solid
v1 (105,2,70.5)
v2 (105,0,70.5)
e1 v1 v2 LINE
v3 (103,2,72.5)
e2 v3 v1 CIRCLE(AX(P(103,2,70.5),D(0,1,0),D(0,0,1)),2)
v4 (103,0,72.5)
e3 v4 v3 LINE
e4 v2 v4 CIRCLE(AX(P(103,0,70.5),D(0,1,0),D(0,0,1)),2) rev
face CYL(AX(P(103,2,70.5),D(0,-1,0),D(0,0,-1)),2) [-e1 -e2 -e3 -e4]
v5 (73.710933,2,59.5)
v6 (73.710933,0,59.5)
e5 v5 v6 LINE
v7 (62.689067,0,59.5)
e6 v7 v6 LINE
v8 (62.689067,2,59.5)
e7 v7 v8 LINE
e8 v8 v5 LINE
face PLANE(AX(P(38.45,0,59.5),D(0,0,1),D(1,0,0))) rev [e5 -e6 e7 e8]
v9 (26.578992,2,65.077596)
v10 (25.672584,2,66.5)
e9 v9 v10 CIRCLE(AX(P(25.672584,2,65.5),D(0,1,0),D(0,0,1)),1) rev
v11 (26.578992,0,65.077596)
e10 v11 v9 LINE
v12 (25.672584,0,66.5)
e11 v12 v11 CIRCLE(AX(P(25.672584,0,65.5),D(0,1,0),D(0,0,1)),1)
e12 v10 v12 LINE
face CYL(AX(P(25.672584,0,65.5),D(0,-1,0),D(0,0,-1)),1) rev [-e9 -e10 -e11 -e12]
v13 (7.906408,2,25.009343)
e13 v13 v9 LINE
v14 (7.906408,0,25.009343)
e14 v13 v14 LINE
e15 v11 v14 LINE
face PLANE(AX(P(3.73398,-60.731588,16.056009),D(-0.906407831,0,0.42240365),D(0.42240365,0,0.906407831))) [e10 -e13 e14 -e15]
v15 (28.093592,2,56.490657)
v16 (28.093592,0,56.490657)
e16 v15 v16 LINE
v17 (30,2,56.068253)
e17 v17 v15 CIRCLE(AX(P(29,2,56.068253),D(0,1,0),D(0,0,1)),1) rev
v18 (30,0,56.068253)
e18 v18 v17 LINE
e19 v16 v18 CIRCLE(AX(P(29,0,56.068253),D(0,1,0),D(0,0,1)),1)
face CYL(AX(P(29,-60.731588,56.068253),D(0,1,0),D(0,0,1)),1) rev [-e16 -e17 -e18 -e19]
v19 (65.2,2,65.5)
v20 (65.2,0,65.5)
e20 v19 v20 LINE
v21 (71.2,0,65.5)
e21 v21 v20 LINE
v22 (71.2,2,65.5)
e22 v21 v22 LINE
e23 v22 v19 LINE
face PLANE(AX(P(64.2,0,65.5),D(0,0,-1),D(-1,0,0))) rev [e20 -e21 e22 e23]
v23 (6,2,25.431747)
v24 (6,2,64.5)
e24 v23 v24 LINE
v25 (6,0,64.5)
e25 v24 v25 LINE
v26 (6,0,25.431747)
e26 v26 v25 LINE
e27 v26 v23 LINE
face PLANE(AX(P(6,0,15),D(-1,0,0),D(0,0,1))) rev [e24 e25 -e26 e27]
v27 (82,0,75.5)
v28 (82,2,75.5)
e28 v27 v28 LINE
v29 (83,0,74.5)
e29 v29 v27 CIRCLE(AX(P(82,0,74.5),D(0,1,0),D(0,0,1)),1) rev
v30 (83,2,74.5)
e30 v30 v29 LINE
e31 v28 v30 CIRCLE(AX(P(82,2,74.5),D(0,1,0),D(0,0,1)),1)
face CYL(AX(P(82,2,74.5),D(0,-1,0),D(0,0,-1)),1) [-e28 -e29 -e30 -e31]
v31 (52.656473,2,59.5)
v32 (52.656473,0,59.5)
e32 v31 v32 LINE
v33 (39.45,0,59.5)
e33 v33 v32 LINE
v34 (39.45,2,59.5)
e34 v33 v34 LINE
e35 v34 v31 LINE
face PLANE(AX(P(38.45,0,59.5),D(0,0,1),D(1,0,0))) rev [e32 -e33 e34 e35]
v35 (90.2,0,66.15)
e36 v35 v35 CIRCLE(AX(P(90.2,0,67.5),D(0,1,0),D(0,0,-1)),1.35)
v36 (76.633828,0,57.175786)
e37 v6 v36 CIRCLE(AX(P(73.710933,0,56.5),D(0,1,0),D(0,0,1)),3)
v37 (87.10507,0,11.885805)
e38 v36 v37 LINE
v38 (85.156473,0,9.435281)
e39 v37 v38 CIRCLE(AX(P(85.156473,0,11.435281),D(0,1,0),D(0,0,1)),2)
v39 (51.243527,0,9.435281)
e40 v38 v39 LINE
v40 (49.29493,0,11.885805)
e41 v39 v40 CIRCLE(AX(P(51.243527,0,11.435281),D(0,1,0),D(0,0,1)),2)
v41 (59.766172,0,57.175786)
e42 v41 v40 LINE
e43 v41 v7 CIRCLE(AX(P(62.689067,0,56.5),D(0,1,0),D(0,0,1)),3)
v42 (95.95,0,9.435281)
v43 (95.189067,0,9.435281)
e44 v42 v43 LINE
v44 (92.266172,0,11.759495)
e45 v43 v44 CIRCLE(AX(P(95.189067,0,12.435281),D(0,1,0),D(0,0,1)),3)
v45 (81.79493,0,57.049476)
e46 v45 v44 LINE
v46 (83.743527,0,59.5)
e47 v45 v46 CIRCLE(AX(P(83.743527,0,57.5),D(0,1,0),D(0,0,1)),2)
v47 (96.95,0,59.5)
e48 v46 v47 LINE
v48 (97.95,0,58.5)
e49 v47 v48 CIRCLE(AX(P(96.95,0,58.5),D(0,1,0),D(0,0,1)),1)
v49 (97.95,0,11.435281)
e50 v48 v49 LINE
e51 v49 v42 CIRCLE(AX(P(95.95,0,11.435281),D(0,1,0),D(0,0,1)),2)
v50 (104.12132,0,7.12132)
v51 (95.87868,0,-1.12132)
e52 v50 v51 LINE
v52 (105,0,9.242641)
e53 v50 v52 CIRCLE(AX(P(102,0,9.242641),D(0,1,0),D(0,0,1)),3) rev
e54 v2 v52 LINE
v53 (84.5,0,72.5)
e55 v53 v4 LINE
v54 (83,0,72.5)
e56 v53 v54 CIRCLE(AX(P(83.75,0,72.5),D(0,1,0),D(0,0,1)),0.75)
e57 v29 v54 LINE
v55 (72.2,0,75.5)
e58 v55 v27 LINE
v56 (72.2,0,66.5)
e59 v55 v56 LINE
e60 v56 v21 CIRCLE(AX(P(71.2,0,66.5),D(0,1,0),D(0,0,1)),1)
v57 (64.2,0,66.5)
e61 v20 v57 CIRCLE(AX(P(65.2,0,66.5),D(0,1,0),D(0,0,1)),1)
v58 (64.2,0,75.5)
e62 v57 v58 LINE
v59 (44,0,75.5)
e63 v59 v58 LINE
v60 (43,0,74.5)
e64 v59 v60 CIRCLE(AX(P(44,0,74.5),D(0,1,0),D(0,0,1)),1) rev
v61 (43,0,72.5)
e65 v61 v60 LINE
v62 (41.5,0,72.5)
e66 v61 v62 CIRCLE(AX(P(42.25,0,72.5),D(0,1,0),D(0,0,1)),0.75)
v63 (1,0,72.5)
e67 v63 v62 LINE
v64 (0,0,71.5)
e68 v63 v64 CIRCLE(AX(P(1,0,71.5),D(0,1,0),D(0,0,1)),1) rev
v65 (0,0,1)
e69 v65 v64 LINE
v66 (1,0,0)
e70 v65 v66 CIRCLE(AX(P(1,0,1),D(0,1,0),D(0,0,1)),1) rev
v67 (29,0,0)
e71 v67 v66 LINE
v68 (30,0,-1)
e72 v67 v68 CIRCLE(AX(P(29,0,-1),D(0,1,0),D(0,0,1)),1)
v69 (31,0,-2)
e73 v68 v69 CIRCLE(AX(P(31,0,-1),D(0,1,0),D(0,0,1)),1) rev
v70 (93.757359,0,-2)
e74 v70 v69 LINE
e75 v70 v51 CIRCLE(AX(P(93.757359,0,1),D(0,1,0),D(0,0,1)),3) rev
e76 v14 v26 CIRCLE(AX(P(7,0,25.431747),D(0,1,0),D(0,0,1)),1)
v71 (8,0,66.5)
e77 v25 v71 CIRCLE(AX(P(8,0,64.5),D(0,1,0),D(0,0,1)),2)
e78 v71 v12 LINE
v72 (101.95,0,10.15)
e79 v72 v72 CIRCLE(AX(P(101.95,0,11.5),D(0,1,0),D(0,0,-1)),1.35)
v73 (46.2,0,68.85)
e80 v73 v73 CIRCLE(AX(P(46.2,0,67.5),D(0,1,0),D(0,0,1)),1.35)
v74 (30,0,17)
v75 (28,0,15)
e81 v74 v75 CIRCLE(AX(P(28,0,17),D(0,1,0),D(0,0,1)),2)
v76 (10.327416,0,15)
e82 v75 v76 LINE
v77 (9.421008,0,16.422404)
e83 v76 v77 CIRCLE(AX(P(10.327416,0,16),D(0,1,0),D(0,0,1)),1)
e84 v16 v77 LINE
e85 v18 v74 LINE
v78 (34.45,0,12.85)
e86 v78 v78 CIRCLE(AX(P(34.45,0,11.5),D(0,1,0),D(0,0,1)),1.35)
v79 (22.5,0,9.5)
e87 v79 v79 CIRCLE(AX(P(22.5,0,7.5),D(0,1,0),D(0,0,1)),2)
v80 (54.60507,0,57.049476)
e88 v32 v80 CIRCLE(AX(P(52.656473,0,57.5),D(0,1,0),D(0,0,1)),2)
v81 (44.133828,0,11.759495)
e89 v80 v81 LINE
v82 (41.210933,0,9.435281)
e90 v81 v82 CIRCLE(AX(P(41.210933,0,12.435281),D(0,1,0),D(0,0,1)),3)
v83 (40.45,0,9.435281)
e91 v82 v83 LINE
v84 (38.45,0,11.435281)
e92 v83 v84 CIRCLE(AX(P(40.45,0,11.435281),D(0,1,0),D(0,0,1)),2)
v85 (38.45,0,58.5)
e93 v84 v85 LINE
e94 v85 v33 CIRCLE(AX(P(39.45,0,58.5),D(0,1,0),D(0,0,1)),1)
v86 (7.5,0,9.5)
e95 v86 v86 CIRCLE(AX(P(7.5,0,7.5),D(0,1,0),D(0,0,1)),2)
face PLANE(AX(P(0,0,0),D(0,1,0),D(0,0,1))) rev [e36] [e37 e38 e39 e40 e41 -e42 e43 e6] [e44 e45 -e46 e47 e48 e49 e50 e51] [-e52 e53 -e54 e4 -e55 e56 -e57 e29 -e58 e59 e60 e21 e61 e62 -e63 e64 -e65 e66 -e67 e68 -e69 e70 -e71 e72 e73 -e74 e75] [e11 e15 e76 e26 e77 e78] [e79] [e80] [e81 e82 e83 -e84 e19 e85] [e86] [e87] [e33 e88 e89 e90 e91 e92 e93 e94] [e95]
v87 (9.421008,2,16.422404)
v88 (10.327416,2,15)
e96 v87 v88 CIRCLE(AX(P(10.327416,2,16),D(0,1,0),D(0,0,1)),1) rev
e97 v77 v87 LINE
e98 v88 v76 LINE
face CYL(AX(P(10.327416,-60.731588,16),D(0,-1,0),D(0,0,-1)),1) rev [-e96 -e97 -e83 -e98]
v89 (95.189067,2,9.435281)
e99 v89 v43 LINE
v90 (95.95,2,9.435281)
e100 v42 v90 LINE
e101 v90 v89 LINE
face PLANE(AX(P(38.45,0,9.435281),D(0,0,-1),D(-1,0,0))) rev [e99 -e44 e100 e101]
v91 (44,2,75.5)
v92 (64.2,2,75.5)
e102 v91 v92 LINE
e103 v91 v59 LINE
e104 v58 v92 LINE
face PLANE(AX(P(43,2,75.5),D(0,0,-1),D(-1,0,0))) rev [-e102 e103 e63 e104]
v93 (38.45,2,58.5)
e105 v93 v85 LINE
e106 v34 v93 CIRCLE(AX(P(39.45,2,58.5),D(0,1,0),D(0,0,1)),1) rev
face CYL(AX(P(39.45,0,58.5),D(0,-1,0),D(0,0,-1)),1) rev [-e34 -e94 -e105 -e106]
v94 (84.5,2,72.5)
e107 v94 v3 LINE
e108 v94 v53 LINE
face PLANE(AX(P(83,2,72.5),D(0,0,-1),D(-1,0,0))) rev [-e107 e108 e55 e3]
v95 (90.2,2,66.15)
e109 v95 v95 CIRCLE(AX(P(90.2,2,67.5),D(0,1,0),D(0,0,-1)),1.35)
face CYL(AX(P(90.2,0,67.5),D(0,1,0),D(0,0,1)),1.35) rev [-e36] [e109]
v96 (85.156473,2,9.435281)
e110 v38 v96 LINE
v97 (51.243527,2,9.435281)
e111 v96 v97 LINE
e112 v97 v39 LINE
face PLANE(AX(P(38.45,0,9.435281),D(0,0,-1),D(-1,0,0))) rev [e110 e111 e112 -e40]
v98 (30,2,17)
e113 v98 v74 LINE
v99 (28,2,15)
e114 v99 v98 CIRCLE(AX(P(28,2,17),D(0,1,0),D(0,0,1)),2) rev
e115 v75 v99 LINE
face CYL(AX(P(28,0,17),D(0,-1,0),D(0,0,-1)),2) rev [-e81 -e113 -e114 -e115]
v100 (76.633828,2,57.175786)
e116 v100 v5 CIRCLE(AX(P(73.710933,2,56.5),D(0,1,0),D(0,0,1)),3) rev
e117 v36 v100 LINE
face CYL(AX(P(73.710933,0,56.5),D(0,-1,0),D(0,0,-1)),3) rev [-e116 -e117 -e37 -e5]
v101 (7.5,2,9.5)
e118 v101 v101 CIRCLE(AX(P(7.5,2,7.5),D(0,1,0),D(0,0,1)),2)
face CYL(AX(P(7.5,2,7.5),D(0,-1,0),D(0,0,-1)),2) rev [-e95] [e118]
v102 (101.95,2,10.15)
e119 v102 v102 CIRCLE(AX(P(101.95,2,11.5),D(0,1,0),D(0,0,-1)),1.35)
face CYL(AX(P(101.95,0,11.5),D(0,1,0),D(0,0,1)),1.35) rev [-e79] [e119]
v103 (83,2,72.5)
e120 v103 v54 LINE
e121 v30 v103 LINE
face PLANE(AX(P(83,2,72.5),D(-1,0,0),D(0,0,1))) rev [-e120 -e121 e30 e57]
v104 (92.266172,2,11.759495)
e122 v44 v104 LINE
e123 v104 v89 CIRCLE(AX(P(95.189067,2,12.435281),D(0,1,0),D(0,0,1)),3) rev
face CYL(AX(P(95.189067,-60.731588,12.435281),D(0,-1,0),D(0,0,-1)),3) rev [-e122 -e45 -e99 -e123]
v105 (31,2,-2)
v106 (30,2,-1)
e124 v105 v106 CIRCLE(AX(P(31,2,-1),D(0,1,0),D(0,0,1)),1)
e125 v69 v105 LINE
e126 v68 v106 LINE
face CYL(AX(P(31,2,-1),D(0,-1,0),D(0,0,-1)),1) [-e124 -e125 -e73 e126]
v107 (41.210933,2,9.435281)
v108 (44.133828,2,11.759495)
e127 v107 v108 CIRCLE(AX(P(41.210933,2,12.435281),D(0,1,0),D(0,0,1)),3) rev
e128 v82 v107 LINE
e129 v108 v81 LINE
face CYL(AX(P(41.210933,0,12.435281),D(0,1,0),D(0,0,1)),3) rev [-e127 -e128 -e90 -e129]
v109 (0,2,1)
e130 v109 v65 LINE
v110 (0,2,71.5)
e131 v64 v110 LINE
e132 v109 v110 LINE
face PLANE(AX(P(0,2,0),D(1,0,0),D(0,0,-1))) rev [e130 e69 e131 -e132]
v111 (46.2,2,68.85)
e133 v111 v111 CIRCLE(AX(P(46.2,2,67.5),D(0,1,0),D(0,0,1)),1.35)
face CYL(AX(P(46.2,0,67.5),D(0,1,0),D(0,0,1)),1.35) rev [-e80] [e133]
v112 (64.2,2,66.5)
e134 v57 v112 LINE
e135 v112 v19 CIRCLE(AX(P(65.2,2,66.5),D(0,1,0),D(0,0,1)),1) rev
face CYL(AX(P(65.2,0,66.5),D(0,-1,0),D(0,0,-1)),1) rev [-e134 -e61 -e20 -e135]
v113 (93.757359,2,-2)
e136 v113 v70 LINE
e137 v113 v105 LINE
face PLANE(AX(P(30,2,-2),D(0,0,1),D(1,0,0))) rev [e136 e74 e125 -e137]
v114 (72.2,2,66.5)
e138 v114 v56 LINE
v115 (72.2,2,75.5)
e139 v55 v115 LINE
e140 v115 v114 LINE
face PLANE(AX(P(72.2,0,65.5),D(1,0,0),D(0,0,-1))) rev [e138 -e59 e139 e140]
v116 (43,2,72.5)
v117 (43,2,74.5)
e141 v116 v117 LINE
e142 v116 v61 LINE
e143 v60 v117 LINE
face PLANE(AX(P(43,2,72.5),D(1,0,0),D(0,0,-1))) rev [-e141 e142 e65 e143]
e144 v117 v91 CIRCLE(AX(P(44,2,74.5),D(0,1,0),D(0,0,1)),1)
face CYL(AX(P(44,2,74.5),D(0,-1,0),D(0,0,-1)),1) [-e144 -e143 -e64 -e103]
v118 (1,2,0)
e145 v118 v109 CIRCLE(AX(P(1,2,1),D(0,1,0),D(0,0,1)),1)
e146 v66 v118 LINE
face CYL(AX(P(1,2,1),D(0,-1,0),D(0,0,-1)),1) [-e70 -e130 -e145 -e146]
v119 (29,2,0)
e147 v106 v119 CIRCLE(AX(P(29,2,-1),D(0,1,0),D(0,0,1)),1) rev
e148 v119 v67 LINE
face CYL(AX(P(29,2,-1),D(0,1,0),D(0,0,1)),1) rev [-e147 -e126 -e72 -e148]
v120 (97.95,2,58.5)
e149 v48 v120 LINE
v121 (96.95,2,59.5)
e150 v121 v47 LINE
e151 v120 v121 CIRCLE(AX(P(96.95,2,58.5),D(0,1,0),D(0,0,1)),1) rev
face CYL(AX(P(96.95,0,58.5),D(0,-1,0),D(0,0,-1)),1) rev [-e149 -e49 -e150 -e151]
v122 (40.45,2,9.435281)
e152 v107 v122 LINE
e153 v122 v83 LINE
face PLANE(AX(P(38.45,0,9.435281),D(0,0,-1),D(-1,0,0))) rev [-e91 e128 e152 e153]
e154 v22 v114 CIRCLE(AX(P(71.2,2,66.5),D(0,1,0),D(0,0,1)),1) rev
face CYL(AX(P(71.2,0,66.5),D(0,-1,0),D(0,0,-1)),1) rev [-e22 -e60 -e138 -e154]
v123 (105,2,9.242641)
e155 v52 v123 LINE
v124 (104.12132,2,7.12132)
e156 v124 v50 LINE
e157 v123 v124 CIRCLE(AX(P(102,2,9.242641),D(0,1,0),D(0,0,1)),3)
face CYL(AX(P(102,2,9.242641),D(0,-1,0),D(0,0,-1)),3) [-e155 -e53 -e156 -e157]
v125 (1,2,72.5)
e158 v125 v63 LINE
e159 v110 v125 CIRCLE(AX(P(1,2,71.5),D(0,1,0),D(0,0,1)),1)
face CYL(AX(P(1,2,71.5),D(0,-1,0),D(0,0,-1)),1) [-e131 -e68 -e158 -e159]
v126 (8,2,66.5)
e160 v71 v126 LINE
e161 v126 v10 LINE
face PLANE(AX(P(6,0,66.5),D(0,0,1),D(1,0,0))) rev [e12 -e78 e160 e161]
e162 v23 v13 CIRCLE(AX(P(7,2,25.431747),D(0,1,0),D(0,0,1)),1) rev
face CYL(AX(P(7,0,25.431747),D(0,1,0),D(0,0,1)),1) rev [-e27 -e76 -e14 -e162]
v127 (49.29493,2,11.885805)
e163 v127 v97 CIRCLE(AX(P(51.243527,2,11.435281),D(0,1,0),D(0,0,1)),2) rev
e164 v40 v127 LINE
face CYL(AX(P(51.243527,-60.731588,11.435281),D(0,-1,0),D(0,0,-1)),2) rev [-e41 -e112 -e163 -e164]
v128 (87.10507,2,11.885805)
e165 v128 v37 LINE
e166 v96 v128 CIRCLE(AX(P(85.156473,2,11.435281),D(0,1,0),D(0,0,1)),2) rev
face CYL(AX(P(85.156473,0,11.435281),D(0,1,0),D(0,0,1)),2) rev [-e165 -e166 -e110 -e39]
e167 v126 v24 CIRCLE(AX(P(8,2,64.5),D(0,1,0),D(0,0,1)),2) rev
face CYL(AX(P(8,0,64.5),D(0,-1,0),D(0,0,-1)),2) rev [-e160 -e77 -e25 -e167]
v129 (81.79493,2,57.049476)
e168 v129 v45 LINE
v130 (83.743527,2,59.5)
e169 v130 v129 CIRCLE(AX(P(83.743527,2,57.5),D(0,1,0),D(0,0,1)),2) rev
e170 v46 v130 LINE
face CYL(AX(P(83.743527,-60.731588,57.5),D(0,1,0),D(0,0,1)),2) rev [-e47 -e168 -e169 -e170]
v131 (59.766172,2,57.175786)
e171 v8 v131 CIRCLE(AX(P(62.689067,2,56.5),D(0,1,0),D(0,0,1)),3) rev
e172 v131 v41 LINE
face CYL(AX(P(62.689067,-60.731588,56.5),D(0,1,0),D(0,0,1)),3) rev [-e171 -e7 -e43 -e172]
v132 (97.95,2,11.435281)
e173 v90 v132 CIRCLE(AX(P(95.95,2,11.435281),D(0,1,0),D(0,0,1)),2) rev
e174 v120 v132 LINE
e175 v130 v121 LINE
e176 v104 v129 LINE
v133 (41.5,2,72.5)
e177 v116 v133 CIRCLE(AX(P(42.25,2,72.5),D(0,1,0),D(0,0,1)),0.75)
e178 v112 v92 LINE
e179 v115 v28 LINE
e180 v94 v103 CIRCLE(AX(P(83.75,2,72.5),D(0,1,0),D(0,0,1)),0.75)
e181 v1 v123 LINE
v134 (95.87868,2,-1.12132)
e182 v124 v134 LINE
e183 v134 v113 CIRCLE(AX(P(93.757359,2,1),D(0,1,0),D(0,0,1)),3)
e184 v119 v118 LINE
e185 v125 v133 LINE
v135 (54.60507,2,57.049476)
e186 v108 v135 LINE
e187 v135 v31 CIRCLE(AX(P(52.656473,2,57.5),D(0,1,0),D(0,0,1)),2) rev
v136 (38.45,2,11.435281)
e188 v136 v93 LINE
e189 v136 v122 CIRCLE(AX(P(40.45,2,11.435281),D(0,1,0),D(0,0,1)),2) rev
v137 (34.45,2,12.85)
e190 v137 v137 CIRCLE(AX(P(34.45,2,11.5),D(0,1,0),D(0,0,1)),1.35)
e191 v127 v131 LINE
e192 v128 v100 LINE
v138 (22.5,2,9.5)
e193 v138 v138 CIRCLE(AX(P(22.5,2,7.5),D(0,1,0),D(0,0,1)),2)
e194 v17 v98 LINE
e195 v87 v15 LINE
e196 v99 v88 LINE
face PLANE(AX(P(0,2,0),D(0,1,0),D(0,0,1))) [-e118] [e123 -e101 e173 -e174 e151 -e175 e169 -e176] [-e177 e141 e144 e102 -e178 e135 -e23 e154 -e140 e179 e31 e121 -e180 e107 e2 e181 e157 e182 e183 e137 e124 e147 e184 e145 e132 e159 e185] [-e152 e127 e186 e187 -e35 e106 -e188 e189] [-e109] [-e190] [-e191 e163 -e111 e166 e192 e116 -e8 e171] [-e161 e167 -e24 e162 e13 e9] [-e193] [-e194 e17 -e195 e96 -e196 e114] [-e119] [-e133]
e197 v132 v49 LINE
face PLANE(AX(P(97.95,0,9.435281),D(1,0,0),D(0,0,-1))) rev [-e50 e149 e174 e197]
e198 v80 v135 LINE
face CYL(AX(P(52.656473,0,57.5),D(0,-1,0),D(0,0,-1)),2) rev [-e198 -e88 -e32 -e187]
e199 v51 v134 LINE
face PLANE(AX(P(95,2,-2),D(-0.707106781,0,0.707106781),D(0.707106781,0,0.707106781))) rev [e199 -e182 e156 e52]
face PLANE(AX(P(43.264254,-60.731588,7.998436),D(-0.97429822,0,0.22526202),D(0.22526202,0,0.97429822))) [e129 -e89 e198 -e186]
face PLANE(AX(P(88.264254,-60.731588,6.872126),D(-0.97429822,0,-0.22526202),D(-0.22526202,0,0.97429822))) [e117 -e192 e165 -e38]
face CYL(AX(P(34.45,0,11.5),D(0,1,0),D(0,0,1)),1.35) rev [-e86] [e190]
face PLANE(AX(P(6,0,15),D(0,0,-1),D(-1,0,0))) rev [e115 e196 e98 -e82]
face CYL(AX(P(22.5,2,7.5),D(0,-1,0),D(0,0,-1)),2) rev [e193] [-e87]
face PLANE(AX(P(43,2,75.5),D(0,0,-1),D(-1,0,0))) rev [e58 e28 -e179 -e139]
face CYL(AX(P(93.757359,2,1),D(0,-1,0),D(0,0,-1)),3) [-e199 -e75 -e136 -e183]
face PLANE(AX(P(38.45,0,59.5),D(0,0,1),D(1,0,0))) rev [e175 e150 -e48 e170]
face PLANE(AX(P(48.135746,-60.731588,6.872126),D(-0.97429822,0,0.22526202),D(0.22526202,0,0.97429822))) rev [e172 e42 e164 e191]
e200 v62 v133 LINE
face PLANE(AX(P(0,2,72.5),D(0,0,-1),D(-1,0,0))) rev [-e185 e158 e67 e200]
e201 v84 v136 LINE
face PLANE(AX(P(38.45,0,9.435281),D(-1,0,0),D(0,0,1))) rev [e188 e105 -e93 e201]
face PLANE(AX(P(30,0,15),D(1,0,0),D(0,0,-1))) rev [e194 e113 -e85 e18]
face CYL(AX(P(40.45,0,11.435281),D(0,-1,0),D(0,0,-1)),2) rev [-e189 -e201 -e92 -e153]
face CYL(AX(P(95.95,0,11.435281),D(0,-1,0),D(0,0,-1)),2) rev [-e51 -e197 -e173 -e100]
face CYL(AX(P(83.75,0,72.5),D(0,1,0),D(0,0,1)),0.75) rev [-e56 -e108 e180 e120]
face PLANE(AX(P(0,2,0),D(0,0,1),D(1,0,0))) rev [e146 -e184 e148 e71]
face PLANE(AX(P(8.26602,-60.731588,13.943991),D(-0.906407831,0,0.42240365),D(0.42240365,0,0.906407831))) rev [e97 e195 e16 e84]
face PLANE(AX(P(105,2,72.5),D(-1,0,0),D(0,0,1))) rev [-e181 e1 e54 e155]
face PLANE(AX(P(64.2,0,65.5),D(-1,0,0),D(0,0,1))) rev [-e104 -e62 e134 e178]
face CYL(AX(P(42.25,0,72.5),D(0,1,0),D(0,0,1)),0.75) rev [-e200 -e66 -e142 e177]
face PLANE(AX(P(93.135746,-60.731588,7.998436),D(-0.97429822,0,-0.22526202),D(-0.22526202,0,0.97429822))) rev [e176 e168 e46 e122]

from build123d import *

# Parameters (mm, degrees)
SKETCH_1_R          = 2
EXTRUDE_1_DEPTH     = 2
SKETCH_4_R          = 1.35
SKETCH_4_W          = 8
SKETCH_4_H          = 10
CUT_EXTRUDE_2_DEPTH = 130.341601969
SKETCH_2_R          = 0.75
SKETCH_2_W          = 24
SKETCH_2_H          = 51.5
SKETCH_2_W_2        = 59.5
SKETCH_2_H_2        = 50.064718626
CUT_EXTRUDE_1_DEPTH = 130.341601969
EXTRUDE_1_2_DEPTH   = 2
FILLET_1_R          = 1
FILLET_3_R          = 3
FILLET_2_R          = 2


with BuildPart() as part:
    # 草图1 → Extrude 1 (new body)
    with BuildSketch(Plane(origin=(0, 0, 0), x_dir=(1, 0, 0), z_dir=(0, 1, 0))):
        Polygon((0, 0), (30, 0), (30, 2), (95, 2), (105, -8), (105, -72.5), (83, -72.5), (83, -75.5), (43, -75.5), (43, -72.5), (0, -72.5), align=None)
        with Locations(Location((7.5, -7.5, 0), (0, 0, 270))):
            Circle(SKETCH_1_R, mode=Mode.SUBTRACT)
        with Locations(Location((22.5, -7.5, 0), (0, 0, 270))):
            Circle(SKETCH_1_R, mode=Mode.SUBTRACT)
    extrude(amount=EXTRUDE_1_DEPTH)

    # 草图4 → 切除-拉伸2 (cut, through all)
    with BuildSketch(Plane(origin=(0, 2, 0), x_dir=(1, 0, 0), z_dir=(0, 1, 0))):
        with Locations(Location((34.45, -11.5, 0), (0, 0, 270))):
            Circle(SKETCH_4_R)
        with Locations(Location((46.2, -67.5, 0), (0, 0, 270))):
            Circle(SKETCH_4_R)
        with Locations(Location((90.2, -67.5, 0), (0, 0, 90))):
            Circle(SKETCH_4_R)
        with Locations(Location((101.95, -11.5, 0), (0, 0, 90))):
            Circle(SKETCH_4_R)
        with Locations((68.2, -70.5)):
            Rectangle(SKETCH_4_W, SKETCH_4_H)
    extrude(amount=-CUT_EXTRUDE_2_DEPTH, mode=Mode.SUBTRACT)

    # 草图2 → 切除-拉伸1 (cut, through all)
    with BuildSketch(Plane(origin=(0, 2, 0), x_dir=(1, 0, 0), z_dir=(0, 1, 0))):
        with Locations((83.75, -72.5)):
            Circle(SKETCH_2_R)
        with Locations((42.25, -72.5)):
            Circle(SKETCH_2_R)
        with Locations((18, -40.75)):
            Rectangle(SKETCH_2_W, SKETCH_2_H)
        with Locations((68.2, -34.467640687)):
            Rectangle(SKETCH_2_W_2, SKETCH_2_H_2)
    extrude(amount=-CUT_EXTRUDE_1_DEPTH, mode=Mode.SUBTRACT)

    # 草图3 → Extrude 1 2 (add)
    with BuildSketch(Plane(origin=(0, 2, 0), x_dir=(1, 0, 0), z_dir=(0, 1, 0))):
        Polygon((3.733980422, -16.056009124), (27.733980422, -67.556009124), (32.266019578, -65.443990876), (8.266019578, -13.943990876), align=None)
        Polygon((43.264254449, -7.998436425), (55.764254449, -62.063155051), (60.635745551, -60.936844949), (48.135745551, -6.872126323), align=None)
        Polygon((88.264254449, -6.872126323), (75.764254449, -60.936844949), (80.635745551, -62.063155051), (93.135745551, -7.998436425), align=None)
    extrude(amount=-EXTRUDE_1_2_DEPTH)

    # 圆角1
    fillet_1_edges = [part.edges().sort_by_distance(p)[0] for p in [
        (27.241859665, 1, 66.5),
        (30, 1, 60.581490531),
        (8.758140335, 1, 15),
        (6, 1, 20.918509469),
        (0, 1, 0),
        (30, 1, 0),
        (30, 1, -2),
        (83, 1, 75.5),
        (43, 1, 75.5),
        (0, 1, 72.5),
        (64.2, 1, 65.5),
        (72.2, 1, 65.5),
        (38.45, 1, 59.5),
        (97.95, 1, 59.5),
    ]]
    fillet(fillet_1_edges, radius=FILLET_1_R - 0.0001)  # a hair under: the kernel refuses the full size

    # 圆角3
    fillet_3_edges = [part.edges().sort_by_distance(p)[0] for p in [
        (60.303540699, 1, 59.5),
        (43.596459301, 1, 9.435281374),
        (95, 1, -2),
        (105, 1, 8),
        (92.803540699, 1, 9.435281374),
        (76.096459301, 1, 59.5),
    ]]
    fillet(fillet_3_edges, radius=FILLET_3_R)

    # 圆角2
    fillet_2_edges = [part.edges().sort_by_distance(p)[0] for p in [
        (55.171641763, 1, 59.5),
        (48.728358237, 1, 9.435281374),
        (105, 1, 72.5),
        (81.228358237, 1, 59.5),
        (87.671641763, 1, 9.435281374),
        (6, 1, 66.5),
        (30, 1, 15),
        (38.45, 1, 9.435281374),
        (97.95, 1, 9.435281374),
    ]]
    fillet(fillet_2_edges, radius=FILLET_2_R)


solid = part.part
